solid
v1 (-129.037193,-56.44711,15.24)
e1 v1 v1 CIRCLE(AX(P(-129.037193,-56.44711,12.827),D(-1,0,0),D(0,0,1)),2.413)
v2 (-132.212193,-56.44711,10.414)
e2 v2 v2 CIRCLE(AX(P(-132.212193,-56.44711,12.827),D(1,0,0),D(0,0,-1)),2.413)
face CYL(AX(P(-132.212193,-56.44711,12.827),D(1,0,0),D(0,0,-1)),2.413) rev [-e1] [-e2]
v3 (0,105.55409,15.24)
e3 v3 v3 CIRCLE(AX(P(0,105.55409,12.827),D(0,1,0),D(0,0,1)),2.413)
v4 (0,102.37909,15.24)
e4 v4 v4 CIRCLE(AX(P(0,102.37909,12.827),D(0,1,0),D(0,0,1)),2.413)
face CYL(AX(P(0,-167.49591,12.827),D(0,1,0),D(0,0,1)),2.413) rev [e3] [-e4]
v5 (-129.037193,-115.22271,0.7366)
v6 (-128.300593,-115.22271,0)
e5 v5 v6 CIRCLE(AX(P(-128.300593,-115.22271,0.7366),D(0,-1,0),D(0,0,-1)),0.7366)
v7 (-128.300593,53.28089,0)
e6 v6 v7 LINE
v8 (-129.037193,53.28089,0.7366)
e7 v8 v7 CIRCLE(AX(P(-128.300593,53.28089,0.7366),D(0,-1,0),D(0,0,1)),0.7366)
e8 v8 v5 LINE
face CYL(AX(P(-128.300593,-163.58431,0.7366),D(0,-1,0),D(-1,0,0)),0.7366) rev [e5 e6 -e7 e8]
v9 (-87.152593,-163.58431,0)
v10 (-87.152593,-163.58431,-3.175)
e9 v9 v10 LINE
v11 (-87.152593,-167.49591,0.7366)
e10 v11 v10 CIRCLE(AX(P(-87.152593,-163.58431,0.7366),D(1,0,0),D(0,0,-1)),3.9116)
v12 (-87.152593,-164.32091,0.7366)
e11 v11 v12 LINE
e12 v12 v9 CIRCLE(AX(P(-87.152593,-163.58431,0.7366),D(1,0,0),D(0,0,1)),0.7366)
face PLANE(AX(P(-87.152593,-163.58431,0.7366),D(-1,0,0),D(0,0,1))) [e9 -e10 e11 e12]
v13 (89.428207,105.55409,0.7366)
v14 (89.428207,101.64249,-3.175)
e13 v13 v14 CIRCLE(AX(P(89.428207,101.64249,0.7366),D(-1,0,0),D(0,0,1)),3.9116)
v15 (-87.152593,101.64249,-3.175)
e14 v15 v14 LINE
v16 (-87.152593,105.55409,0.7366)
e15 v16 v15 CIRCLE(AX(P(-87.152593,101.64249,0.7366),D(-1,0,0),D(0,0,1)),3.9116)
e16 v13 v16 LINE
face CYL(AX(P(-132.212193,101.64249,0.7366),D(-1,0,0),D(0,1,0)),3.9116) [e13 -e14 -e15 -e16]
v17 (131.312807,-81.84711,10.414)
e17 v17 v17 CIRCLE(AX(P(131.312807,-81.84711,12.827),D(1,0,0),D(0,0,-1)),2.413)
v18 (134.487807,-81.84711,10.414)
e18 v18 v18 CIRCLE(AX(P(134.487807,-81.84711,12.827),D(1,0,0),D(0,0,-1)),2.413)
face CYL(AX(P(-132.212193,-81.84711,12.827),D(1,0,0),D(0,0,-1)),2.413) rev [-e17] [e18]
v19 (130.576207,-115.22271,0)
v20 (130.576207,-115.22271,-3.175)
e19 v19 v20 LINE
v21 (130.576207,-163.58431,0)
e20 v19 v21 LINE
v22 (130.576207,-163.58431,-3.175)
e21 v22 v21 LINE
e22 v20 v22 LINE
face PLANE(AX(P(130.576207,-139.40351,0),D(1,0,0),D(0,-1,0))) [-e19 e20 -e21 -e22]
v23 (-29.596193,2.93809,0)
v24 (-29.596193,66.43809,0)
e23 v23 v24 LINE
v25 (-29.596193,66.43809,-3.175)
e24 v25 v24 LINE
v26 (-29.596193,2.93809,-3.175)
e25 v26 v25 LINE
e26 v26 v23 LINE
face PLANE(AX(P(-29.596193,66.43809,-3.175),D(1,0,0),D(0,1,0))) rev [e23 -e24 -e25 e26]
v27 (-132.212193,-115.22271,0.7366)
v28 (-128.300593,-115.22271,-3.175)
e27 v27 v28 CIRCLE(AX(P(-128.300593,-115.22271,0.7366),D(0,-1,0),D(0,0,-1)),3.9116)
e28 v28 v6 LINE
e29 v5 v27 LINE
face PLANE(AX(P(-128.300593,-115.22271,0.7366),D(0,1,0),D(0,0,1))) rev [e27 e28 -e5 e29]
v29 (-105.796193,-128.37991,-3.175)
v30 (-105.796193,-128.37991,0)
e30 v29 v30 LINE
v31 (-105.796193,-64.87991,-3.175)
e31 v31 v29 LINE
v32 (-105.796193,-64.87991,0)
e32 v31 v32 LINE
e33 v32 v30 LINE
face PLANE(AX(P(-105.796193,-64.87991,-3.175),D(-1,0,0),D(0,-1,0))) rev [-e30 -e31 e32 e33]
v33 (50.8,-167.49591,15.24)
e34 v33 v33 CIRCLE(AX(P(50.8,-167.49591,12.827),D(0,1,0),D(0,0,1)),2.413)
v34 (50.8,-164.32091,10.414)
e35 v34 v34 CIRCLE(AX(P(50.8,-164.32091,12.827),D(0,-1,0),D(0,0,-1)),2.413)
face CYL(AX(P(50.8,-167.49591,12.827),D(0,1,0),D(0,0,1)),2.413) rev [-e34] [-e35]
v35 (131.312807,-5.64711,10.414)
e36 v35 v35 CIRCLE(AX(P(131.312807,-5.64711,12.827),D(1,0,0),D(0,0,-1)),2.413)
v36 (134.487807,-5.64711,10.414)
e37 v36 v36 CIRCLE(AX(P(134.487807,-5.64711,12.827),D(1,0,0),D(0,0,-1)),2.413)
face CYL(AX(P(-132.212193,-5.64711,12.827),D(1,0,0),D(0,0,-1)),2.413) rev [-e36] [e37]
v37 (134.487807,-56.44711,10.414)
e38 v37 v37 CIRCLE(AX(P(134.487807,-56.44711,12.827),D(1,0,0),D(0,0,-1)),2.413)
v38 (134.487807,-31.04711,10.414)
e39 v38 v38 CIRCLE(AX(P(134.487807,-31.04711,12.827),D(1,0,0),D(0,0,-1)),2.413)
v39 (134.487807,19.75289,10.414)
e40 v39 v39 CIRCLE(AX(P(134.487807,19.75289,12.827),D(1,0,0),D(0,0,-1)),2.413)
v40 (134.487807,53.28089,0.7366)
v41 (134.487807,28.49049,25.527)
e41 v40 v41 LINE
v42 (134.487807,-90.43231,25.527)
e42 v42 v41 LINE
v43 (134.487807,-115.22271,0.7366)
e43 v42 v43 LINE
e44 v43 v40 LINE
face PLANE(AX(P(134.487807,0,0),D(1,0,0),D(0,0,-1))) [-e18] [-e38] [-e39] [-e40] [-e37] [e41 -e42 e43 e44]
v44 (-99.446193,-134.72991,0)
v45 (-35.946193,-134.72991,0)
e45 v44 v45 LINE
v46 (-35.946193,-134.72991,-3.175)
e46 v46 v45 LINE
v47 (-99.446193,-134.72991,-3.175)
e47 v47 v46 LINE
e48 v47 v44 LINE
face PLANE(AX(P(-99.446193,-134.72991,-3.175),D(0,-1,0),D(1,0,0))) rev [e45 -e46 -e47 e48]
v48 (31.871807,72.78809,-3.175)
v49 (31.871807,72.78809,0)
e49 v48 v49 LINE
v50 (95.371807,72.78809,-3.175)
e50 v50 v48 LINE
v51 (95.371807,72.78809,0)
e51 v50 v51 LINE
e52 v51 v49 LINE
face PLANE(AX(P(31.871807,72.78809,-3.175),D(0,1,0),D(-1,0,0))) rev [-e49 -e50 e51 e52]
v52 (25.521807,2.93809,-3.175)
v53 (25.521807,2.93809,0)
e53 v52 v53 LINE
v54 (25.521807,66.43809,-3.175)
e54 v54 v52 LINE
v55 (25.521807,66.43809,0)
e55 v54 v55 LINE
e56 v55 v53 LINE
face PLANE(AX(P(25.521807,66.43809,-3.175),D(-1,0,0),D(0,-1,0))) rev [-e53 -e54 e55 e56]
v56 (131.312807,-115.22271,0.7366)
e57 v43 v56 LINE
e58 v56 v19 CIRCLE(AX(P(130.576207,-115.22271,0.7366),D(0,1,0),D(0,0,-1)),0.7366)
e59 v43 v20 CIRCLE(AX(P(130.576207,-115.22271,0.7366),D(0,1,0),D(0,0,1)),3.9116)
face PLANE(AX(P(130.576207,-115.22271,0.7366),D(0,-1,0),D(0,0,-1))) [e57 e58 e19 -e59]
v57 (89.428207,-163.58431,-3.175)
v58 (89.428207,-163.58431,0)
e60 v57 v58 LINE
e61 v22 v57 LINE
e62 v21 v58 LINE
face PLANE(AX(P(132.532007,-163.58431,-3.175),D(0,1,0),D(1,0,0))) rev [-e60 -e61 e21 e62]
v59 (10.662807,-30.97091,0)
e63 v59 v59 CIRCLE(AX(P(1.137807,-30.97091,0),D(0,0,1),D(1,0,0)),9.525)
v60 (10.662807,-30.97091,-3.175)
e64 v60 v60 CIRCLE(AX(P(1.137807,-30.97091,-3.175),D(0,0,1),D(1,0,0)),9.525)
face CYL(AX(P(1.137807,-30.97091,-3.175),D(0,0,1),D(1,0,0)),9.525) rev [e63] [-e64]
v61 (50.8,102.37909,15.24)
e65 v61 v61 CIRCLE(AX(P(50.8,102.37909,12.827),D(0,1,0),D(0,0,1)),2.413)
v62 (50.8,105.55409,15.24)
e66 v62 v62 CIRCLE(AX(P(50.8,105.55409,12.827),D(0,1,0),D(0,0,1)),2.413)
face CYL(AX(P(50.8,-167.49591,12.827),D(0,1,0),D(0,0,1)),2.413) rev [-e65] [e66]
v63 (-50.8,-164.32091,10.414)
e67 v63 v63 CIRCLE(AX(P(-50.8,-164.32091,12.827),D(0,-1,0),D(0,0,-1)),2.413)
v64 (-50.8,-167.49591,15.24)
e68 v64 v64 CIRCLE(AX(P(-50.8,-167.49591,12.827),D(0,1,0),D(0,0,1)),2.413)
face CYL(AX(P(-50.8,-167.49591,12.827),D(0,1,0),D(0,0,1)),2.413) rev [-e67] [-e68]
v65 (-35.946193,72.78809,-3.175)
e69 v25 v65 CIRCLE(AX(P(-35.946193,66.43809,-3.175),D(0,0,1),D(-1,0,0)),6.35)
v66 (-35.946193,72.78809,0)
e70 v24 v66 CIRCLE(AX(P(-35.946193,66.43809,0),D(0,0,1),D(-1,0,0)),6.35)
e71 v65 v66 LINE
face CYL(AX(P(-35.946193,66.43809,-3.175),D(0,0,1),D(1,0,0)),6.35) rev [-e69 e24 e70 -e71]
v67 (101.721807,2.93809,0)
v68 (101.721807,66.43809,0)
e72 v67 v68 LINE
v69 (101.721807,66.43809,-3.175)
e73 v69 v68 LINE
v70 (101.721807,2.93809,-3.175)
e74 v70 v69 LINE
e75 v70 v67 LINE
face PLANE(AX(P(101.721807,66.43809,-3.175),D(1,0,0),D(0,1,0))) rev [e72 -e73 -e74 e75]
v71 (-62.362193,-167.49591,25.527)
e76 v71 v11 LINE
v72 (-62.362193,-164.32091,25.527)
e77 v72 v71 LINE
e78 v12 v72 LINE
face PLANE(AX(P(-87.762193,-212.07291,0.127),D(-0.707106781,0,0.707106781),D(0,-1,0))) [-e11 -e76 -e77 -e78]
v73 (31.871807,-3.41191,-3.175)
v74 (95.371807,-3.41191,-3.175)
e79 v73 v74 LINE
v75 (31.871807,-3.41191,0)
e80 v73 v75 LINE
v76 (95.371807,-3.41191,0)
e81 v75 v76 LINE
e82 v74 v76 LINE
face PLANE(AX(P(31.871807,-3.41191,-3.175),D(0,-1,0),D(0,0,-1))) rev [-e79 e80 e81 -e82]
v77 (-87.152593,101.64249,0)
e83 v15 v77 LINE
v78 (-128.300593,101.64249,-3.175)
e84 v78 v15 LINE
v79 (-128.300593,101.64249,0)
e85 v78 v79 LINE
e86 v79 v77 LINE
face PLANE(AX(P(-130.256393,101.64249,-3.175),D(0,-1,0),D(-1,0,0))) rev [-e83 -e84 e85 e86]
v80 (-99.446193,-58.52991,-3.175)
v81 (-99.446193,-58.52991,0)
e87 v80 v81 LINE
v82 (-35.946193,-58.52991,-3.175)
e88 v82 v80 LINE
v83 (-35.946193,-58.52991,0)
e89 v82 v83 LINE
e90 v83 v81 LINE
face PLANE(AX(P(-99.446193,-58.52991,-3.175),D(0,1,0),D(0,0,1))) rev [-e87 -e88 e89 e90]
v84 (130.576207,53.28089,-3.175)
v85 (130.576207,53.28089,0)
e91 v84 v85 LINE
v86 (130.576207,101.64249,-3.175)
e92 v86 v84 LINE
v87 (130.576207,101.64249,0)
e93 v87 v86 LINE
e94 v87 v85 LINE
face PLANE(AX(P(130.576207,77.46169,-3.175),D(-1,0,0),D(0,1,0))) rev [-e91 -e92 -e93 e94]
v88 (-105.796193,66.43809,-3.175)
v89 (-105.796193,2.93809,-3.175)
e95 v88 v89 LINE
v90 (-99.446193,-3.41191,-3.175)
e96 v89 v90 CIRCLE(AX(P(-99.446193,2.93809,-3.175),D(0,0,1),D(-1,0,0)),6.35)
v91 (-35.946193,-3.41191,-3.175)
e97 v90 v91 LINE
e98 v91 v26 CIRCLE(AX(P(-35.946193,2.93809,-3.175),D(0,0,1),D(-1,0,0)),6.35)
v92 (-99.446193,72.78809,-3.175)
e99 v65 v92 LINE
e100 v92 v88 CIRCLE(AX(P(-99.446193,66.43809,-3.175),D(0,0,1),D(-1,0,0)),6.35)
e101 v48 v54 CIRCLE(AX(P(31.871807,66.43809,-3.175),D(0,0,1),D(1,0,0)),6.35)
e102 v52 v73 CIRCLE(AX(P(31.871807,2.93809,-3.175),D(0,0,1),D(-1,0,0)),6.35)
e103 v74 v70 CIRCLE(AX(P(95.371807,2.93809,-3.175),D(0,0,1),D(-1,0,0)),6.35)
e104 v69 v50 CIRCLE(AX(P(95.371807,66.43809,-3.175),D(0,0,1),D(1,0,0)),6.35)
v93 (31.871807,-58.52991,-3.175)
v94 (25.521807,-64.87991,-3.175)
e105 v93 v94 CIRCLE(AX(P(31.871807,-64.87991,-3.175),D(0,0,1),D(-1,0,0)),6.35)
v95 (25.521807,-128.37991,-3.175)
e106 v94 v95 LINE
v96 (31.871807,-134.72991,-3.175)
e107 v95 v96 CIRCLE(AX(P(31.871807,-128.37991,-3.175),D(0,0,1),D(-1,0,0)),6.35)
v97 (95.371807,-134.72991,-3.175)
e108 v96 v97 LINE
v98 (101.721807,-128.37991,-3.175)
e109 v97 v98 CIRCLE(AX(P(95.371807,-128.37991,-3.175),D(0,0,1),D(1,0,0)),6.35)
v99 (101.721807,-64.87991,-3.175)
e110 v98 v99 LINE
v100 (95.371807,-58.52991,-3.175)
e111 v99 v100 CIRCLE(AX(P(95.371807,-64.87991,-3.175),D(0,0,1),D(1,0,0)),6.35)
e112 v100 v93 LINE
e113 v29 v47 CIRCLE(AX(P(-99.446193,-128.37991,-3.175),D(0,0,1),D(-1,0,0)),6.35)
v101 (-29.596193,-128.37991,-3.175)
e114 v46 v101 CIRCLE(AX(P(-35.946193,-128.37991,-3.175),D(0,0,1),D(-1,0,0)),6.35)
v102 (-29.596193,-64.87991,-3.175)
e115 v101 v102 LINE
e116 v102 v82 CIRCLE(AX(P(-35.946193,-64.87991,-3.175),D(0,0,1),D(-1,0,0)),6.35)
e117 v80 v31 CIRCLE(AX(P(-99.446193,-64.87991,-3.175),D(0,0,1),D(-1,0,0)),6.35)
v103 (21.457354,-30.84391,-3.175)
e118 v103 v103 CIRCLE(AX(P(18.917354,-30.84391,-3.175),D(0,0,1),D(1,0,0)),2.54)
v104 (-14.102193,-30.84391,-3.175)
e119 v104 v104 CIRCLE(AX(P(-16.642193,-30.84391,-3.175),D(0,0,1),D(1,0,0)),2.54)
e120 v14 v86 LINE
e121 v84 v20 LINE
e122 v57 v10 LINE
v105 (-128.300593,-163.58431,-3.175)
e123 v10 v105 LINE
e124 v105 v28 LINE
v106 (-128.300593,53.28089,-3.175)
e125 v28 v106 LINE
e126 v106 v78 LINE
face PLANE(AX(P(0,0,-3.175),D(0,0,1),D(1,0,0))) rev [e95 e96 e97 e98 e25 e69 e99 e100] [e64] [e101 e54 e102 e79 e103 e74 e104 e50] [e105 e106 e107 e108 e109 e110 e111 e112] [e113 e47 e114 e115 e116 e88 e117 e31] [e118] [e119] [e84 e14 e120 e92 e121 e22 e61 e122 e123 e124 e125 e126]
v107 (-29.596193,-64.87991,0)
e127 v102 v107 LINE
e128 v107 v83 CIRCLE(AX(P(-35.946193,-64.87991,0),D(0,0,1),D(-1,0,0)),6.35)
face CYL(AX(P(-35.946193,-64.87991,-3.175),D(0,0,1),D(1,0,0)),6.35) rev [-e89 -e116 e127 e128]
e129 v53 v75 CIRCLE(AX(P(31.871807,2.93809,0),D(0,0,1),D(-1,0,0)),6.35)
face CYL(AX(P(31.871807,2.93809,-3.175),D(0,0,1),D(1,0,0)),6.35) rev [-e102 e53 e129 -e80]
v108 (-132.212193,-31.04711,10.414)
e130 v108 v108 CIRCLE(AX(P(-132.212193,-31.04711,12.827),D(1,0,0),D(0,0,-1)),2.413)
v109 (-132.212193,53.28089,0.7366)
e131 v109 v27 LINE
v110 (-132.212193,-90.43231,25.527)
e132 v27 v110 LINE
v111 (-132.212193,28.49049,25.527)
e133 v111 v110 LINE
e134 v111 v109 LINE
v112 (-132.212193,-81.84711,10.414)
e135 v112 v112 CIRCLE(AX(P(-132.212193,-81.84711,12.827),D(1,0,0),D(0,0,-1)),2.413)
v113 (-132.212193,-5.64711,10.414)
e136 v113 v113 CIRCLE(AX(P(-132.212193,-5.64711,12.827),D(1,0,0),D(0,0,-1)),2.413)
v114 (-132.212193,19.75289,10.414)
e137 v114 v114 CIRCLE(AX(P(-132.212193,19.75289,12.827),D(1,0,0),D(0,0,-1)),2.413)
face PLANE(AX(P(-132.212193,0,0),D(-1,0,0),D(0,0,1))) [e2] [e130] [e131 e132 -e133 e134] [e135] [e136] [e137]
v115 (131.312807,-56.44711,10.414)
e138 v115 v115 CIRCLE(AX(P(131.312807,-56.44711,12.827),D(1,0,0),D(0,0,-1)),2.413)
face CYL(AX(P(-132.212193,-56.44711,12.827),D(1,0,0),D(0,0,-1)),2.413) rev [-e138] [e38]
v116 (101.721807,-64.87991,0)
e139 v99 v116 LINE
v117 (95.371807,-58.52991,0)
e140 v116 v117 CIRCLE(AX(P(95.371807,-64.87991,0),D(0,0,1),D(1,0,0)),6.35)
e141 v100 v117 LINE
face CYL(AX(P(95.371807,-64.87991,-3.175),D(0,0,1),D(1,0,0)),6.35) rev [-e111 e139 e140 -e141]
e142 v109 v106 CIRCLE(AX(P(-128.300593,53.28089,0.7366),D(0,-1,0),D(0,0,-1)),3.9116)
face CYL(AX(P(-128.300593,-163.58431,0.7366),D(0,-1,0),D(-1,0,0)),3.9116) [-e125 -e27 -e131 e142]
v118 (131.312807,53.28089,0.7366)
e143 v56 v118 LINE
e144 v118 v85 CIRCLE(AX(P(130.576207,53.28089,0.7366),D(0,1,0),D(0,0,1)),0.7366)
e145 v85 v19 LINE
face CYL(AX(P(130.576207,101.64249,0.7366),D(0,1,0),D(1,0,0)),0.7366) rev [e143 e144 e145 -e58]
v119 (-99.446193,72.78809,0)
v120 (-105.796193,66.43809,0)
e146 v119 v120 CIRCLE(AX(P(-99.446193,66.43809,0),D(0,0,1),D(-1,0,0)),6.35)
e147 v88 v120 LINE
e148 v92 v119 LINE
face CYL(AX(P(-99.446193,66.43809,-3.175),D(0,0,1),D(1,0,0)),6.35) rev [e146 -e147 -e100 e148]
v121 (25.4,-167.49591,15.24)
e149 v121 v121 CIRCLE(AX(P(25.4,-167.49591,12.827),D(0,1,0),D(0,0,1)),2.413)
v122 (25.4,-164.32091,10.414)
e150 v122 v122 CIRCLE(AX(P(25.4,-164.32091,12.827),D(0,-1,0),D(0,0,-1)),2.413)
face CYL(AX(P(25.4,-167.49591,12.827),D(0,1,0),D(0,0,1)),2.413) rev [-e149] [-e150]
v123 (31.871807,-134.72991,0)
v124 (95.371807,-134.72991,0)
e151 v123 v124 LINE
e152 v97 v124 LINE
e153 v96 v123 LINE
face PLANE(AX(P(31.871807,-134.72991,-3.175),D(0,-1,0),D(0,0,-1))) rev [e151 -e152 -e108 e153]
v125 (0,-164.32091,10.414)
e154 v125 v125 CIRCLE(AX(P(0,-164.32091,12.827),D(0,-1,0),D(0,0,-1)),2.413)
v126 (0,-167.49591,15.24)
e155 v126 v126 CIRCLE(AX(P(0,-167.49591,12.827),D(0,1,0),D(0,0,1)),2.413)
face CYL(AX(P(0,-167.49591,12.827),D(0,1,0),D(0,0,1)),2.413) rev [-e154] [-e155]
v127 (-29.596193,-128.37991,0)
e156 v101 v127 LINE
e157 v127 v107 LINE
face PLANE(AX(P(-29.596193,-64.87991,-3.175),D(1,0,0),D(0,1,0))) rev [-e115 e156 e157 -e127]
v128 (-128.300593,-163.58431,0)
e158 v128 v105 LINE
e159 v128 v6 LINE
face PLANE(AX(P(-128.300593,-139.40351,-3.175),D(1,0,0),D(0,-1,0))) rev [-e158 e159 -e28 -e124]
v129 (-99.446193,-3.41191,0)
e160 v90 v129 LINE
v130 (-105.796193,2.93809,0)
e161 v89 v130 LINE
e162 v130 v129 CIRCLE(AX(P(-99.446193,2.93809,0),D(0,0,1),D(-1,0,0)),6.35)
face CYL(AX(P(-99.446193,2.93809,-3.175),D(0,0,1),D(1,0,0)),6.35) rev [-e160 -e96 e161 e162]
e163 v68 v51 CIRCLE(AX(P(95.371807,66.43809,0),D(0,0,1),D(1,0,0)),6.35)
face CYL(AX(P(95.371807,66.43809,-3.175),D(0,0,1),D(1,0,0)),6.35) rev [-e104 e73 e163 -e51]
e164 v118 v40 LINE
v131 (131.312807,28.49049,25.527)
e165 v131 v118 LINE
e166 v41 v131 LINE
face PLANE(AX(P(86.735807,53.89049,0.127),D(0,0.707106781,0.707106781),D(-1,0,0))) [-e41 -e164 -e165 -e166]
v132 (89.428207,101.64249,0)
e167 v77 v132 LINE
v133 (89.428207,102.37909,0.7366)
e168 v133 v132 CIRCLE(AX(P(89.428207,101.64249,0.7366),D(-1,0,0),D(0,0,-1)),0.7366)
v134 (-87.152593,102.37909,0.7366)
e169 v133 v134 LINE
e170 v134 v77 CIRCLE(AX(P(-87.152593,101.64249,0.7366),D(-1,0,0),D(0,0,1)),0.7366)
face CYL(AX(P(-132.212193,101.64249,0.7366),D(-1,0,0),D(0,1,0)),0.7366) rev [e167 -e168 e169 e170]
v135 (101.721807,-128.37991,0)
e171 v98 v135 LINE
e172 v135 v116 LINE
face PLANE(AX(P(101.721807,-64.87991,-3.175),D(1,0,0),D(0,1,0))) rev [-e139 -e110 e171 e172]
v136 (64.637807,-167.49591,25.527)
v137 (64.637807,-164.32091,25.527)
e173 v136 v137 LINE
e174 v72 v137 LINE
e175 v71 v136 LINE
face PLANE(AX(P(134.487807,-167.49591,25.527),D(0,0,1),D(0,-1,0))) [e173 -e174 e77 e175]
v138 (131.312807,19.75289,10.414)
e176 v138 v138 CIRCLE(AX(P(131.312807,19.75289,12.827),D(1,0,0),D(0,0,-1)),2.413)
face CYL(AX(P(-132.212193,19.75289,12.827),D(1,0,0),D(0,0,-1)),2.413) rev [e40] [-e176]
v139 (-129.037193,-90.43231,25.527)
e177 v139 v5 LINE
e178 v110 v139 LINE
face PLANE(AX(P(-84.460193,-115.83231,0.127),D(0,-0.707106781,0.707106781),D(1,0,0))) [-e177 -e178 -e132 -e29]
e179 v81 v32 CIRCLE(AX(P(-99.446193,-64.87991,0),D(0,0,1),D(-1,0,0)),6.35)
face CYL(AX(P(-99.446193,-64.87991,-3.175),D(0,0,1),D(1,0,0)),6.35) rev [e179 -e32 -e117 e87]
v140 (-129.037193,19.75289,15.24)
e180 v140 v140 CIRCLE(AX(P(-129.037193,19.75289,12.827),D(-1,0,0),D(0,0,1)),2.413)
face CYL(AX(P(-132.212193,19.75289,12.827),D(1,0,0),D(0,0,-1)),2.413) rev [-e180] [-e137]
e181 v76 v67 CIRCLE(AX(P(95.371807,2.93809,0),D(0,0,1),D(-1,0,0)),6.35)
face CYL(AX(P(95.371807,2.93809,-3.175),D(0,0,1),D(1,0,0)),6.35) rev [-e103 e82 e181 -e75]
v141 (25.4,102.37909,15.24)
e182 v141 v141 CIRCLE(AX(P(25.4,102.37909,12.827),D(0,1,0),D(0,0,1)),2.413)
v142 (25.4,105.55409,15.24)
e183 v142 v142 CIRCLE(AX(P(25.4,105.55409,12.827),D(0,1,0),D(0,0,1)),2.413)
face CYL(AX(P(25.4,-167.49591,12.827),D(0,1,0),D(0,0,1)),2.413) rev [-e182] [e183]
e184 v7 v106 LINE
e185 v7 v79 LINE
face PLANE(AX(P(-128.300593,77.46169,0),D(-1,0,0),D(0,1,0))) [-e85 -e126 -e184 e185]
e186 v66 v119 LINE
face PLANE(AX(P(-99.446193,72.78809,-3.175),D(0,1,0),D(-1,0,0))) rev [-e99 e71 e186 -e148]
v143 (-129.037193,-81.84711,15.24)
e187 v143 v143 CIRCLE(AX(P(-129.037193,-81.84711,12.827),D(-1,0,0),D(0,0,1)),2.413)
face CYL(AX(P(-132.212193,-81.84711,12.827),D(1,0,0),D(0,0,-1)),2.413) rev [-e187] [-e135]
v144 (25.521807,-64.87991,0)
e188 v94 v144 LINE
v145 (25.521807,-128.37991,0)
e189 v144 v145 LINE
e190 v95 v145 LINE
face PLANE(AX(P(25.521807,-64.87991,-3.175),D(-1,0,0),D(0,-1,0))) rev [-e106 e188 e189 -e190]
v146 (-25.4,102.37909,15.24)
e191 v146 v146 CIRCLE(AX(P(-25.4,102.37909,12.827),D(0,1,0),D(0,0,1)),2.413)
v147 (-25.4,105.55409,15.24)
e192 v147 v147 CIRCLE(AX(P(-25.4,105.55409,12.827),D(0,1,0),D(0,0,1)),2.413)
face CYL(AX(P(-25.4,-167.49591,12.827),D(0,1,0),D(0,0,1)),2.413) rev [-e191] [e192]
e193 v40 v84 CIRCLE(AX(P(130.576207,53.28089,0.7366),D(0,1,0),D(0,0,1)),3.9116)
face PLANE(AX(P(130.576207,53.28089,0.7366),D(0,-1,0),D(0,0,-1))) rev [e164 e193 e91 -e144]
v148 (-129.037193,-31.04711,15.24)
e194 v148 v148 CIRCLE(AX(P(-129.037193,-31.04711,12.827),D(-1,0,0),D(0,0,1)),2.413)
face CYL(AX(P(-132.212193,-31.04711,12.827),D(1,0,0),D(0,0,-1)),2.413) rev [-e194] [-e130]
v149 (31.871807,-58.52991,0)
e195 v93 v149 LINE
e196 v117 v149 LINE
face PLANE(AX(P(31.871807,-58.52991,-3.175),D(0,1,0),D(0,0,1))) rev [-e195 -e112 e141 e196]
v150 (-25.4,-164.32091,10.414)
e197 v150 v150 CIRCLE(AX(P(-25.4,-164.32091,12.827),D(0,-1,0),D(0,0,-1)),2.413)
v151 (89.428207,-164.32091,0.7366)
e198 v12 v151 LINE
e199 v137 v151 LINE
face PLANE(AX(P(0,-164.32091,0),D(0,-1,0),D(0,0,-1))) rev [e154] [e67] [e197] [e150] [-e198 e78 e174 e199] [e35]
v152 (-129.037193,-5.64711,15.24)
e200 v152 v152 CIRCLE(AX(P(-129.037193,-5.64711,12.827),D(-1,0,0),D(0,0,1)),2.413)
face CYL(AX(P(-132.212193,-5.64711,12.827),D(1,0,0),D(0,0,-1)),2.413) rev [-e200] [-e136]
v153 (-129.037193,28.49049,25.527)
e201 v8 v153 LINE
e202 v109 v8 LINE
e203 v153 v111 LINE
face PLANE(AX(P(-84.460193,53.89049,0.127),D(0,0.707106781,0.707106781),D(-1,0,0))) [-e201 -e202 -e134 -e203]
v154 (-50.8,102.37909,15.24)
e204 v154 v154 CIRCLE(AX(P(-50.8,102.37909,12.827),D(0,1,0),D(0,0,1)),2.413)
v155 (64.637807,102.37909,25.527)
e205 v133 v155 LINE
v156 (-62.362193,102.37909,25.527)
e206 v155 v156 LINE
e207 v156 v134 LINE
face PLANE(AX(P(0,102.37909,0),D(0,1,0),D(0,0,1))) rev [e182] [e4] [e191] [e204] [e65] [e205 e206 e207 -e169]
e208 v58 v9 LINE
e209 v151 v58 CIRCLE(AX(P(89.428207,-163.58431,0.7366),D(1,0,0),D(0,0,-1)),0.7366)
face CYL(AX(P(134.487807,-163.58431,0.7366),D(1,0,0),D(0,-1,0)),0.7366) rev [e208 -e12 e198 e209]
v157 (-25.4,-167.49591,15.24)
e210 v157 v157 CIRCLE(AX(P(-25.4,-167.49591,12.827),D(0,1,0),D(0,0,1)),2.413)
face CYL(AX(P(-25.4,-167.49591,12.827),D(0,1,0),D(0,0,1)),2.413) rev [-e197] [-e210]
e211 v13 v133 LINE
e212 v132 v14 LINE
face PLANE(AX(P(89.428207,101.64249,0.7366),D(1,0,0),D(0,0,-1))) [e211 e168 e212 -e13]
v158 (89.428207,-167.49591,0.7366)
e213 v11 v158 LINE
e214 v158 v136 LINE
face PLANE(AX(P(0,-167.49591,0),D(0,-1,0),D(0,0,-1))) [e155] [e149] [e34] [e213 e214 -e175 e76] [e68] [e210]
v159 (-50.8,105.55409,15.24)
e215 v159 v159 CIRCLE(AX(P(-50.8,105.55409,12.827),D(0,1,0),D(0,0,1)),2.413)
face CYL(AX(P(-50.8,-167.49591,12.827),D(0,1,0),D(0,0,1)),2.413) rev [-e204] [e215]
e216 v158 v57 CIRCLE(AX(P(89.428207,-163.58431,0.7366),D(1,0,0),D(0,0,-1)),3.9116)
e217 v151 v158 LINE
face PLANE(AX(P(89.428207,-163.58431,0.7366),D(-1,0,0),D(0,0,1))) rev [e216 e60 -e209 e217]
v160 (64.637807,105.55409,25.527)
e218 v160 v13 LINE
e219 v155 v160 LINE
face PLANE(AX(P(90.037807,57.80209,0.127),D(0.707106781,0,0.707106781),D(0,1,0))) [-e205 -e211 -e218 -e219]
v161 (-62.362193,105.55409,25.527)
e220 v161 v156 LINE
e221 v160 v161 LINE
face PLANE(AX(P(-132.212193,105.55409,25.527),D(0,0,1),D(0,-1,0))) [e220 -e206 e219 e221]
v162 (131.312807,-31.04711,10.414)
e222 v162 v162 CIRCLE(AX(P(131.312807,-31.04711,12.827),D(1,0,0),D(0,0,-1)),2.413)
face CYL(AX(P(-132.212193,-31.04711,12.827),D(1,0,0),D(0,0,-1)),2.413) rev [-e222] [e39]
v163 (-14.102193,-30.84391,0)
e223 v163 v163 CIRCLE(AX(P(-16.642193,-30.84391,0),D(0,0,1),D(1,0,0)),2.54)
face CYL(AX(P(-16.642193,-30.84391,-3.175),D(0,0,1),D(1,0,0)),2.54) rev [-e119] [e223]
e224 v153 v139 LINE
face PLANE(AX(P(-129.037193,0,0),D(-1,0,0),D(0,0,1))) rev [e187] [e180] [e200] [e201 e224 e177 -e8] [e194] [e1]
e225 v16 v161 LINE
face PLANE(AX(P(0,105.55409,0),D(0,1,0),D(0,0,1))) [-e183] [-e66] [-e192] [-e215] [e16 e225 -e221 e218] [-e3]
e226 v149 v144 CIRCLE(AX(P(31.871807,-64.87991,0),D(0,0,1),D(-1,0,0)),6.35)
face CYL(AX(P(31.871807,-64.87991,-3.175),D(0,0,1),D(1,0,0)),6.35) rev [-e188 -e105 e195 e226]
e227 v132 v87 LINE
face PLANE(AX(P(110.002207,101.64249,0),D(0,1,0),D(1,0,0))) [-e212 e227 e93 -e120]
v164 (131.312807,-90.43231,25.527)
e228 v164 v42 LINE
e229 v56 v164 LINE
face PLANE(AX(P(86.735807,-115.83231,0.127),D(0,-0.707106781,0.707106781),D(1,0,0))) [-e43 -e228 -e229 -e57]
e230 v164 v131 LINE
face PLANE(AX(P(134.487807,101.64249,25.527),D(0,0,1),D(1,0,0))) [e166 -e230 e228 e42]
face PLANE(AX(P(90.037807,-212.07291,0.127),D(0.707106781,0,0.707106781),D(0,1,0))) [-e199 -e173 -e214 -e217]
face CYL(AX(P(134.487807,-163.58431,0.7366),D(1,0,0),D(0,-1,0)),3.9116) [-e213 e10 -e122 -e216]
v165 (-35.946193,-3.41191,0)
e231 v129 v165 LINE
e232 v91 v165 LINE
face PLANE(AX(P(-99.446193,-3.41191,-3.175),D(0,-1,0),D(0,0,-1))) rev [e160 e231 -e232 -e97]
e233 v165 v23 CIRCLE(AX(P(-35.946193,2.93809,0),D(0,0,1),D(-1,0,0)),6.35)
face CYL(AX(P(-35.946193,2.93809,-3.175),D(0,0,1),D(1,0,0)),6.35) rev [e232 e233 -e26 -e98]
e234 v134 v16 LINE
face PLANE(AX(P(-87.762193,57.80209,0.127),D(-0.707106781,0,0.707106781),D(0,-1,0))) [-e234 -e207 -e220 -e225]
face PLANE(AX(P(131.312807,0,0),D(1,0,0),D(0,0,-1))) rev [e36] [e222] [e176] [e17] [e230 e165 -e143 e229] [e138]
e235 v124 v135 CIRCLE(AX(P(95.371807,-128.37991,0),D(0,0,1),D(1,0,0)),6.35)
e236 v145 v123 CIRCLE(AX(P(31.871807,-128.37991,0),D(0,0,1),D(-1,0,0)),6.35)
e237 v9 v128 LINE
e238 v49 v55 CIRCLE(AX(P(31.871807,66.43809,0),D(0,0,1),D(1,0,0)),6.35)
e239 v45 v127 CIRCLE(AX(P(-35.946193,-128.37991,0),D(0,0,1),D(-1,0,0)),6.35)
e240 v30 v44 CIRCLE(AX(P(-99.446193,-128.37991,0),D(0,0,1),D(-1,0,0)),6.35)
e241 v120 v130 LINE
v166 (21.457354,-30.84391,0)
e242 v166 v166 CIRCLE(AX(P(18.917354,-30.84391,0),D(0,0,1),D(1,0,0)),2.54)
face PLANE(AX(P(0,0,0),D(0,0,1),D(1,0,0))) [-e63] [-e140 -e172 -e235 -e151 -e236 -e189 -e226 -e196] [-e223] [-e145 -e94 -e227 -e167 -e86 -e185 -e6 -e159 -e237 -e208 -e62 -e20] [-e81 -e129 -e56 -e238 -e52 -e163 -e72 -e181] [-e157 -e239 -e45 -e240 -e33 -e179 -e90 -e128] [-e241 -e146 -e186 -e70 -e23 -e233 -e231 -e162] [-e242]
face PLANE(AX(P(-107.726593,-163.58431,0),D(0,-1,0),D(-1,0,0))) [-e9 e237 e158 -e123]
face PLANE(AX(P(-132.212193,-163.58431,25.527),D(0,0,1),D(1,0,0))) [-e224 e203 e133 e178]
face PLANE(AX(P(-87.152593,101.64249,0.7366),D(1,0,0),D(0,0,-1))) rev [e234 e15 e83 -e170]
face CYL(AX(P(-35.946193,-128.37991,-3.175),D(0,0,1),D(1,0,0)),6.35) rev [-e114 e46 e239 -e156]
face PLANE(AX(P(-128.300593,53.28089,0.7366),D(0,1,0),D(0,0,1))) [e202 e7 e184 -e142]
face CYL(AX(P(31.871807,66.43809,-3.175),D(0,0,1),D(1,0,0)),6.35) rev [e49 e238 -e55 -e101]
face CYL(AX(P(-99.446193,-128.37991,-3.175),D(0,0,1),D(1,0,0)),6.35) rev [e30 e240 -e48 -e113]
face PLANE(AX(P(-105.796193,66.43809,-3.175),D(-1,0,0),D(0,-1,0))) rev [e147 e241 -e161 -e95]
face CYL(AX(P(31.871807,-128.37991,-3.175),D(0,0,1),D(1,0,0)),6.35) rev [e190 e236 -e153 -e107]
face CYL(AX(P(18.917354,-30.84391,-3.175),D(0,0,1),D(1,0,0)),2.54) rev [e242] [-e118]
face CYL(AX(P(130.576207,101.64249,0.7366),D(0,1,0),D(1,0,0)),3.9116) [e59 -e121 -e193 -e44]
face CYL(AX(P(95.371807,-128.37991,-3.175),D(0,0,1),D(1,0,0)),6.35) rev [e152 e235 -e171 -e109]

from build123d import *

# Parameters (mm, degrees)
SKETCH1_W                     = 266.7
SKETCH1_H                     = 273.05
SKETCH1_R                     = 9.525
SKETCH1_R_2                   = 2.54
BASE_FLANGE4_DEPTH            = 3.175
EDGE_FLANGE13_STRIP_W         = 14.1732
EDGE_FLANGE13_STRIP_H         = 3.175
EDGE_FLANGE13_STRIP_CUT_DEPTH = 266.7
EDGE_FLANGE13_DEPTH           = 266.7
EDGE_FLANGE14_STRIP_W         = 14.1732
EDGE_FLANGE14_STRIP_H         = 3.175
EDGE_FLANGE14_STRIP_CUT_DEPTH = 266.7
EDGE_FLANGE14_DEPTH           = 266.7
SKETCH97_W                    = 44.45
SKETCH97_H                    = 24.7904
CUT_EXTRUDE17_DEPTH           = 47.752
SKETCH98_W                    = 44.45
SKETCH98_H                    = 24.7904
CUT_EXTRUDE18_DEPTH           = 47.752
SKETCH99_W                    = 44.45
SKETCH99_H                    = 24.7904
CUT_EXTRUDE19_DEPTH           = 47.752
SKETCH100_W                   = 44.45
SKETCH100_H                   = 24.7904
CUT_EXTRUDE20_DEPTH           = 47.752
EDGE_FLANGE15_STRIP_W         = 14.1732
EDGE_FLANGE15_STRIP_H         = 3.175
EDGE_FLANGE15_STRIP_CUT_DEPTH = 265.2268
EDGE_FLANGE15_DEPTH           = 265.2268
EDGE_FLANGE16_STRIP_W         = 14.1732
EDGE_FLANGE16_STRIP_H         = 3.175
EDGE_FLANGE16_STRIP_CUT_DEPTH = 265.2268
EDGE_FLANGE16_DEPTH           = 265.2268
SKETCH107_W                   = 24.7904
SKETCH107_H                   = 47.752
CUT_EXTRUDE21_DEPTH           = 47.752
SKETCH108_W                   = 24.7904
SKETCH108_H                   = 47.752
CUT_EXTRUDE22_DEPTH           = 47.752
SKETCH109_W                   = 24.7904
SKETCH109_H                   = 47.752
CUT_EXTRUDE23_DEPTH           = 47.752
SKETCH110_W                   = 24.7904
SKETCH110_H                   = 47.752
CUT_EXTRUDE24_DEPTH           = 47.752
CHAMFER5_SIZE                 = 25.4
SKETCH113_R                   = 2.413
CUT_EXTRUDE25_DEPTH           = 306.44213946
SKETCH114_R                   = 2.413
CUT_EXTRUDE26_DEPTH           = 316.967399731
CUT_EXTRUDE28_START           = -45.0596
CUT_EXTRUDE28_DEPTH           = 45.0596
CUT_EXTRUDE29_DEPTH           = 45.0596
CUT_EXTRUDE30_START           = -48.3616
CUT_EXTRUDE30_DEPTH           = 48.3616
CUT_EXTRUDE31_DEPTH           = 45.0596
CUT_EXTRUDE32_START           = -45.0596
CUT_EXTRUDE32_DEPTH           = 45.0596
CUT_EXTRUDE33_DEPTH           = 48.3616
CUT_EXTRUDE34_DEPTH           = 48.3616
CUT_EXTRUDE35_START           = -48.3616
CUT_EXTRUDE35_DEPTH           = 48.3616


# Sheet-metal steps are written as plain solids
with BuildPart() as part:
    # Sketch1 → Base-Flange4 (new body)
    with BuildSketch(Plane.XY):
        with Locations((1.137807361, -30.97091029)):
            Rectangle(SKETCH1_W, SKETCH1_H)
        with Locations((1.137807361, -30.97091029)):
            Circle(SKETCH1_R, mode=Mode.SUBTRACT)
        with Locations((-16.642192639, -30.84391029)):
            Circle(SKETCH1_R_2, mode=Mode.SUBTRACT)
        with Locations((18.917353784, -30.84391029)):
            Circle(SKETCH1_R_2, mode=Mode.SUBTRACT)
        with BuildLine():
            Line((-99.446192639, 72.78808971), (-35.946192639, 72.78808971))
            ThreePointArc((-35.946192639, 72.78808971), (-31.456064579, 70.92821777), (-29.596192639, 66.43808971))
            Line((-29.596192639, 66.43808971), (-29.596192639, 2.93808971))
            ThreePointArc((-29.596192639, 2.93808971), (-31.456064579, -1.552038351), (-35.946192639, -3.41191029))
            Line((-35.946192639, -3.41191029), (-99.446192639, -3.41191029))
            ThreePointArc((-99.446192639, -3.41191029), (-103.9363207, -1.552038351), (-105.796192639, 2.93808971))
            Line((-105.796192639, 2.93808971), (-105.796192639, 66.43808971))
            ThreePointArc((-105.796192639, 66.43808971), (-103.9363207, 70.92821777), (-99.446192639, 72.78808971))
        make_face(mode=Mode.SUBTRACT)
        with BuildLine():
            Line((31.871807361, 72.78808971), (95.371807361, 72.78808971))
            ThreePointArc((95.371807361, 72.78808971), (99.861935421, 70.92821777), (101.721807361, 66.43808971))
            Line((101.721807361, 66.43808971), (101.721807361, 2.93808971))
            ThreePointArc((101.721807361, 2.93808971), (99.861935421, -1.552038351), (95.371807361, -3.41191029))
            Line((95.371807361, -3.41191029), (31.871807361, -3.41191029))
            ThreePointArc((31.871807361, -3.41191029), (27.3816793, -1.552038351), (25.521807361, 2.93808971))
            Line((25.521807361, 2.93808971), (25.521807361, 66.43808971))
            ThreePointArc((25.521807361, 66.43808971), (27.3816793, 70.92821777), (31.871807361, 72.78808971))
        make_face(mode=Mode.SUBTRACT)
        with BuildLine():
            Line((-99.446192639, -58.52991029), (-35.946192639, -58.52991029))
            ThreePointArc((-35.946192639, -58.52991029), (-31.456064579, -60.38978223), (-29.596192639, -64.87991029))
            Line((-29.596192639, -64.87991029), (-29.596192639, -128.37991029))
            ThreePointArc((-29.596192639, -128.37991029), (-31.456064579, -132.870038351), (-35.946192639, -134.72991029))
            Line((-35.946192639, -134.72991029), (-99.446192639, -134.72991029))
            ThreePointArc((-99.446192639, -134.72991029), (-103.9363207, -132.870038351), (-105.796192639, -128.37991029))
            Line((-105.796192639, -128.37991029), (-105.796192639, -64.87991029))
            ThreePointArc((-105.796192639, -64.87991029), (-103.9363207, -60.38978223), (-99.446192639, -58.52991029))
        make_face(mode=Mode.SUBTRACT)
        with BuildLine():
            Line((31.871807361, -58.52991029), (95.371807361, -58.52991029))
            ThreePointArc((95.371807361, -58.52991029), (99.861935421, -60.38978223), (101.721807361, -64.87991029))
            Line((101.721807361, -64.87991029), (101.721807361, -128.37991029))
            ThreePointArc((101.721807361, -128.37991029), (99.861935421, -132.870038351), (95.371807361, -134.72991029))
            Line((95.371807361, -134.72991029), (31.871807361, -134.72991029))
            ThreePointArc((31.871807361, -134.72991029), (27.3816793, -132.870038351), (25.521807361, -128.37991029))
            Line((25.521807361, -128.37991029), (25.521807361, -64.87991029))
            ThreePointArc((25.521807361, -64.87991029), (27.3816793, -60.38978223), (31.871807361, -58.52991029))
        make_face(mode=Mode.SUBTRACT)
    extrude(amount=-BASE_FLANGE4_DEPTH)

    # Edge-Flange13 strip (across the edge) → Edge-Flange13 strip cut (cut)
    with BuildSketch(Plane(origin=(-132.212192639, -167.49591029, 0), x_dir=(0, 1, 0), z_dir=(1, 0, 0))):
        with Locations((-3.175, -1.5875)):
            Rectangle(EDGE_FLANGE13_STRIP_W, EDGE_FLANGE13_STRIP_H)
    extrude(amount=EDGE_FLANGE13_STRIP_CUT_DEPTH, mode=Mode.SUBTRACT)

    # Edge-Flange13 section (across the edge) → Edge-Flange13 (add)
    with BuildSketch(Plane(origin=(-132.212192639, -167.49591029, 0), x_dir=(0, 1, 0), z_dir=(1, 0, 0))):
        with BuildLine():
            Line((0, 0.7366), (0, 25.527))
            Line((0, 25.527), (3.175, 25.527))
            Line((3.175, 25.527), (3.175, 0.7366))
            ThreePointArc((3.175, 0.7366), (3.390745145, 0.215745145), (3.9116, 0))
            Line((3.9116, 0), (3.9116, -3.175))
            ThreePointArc((3.9116, -3.175), (1.145681115, -2.029318885), (0, 0.7366))
        make_face()
    extrude(amount=EDGE_FLANGE13_DEPTH)

    # Edge-Flange14 strip (across the edge) → Edge-Flange14 strip cut (cut)
    with BuildSketch(Plane(origin=(134.487807361, 105.55408971, 0), x_dir=(0, -1, 0), z_dir=(-1, 0, 0))):
        with Locations((-3.175, -1.5875)):
            Rectangle(EDGE_FLANGE14_STRIP_W, EDGE_FLANGE14_STRIP_H)
    extrude(amount=EDGE_FLANGE14_STRIP_CUT_DEPTH, mode=Mode.SUBTRACT)

    # Edge-Flange14 section (across the edge) → Edge-Flange14 (add)
    with BuildSketch(Plane(origin=(134.487807361, 105.55408971, 0), x_dir=(0, -1, 0), z_dir=(-1, 0, 0))):
        with BuildLine():
            Line((0, 0.7366), (0, 25.527))
            Line((0, 25.527), (3.175, 25.527))
            Line((3.175, 25.527), (3.175, 0.7366))
            ThreePointArc((3.175, 0.7366), (3.390745145, 0.215745145), (3.9116, 0))
            Line((3.9116, 0), (3.9116, -3.175))
            ThreePointArc((3.9116, -3.175), (1.145681115, -2.029318885), (0, 0.7366))
        make_face()
    extrude(amount=EDGE_FLANGE14_DEPTH)

    # Sketch97 → Cut-Extrude17 (cut)
    with BuildSketch(Plane(origin=(0, -164.32091029, 0), x_dir=(1, 0, 0), z_dir=(0, 1, 0))):
        with Locations((112.262807361, -13.1318)):
            Rectangle(SKETCH97_W, SKETCH97_H)
    extrude(amount=-CUT_EXTRUDE17_DEPTH, mode=Mode.SUBTRACT)

    # Sketch98 → Cut-Extrude18 (cut)
    with BuildSketch(Plane(origin=(0, -164.32091029, 0), x_dir=(1, 0, 0), z_dir=(0, 1, 0))):
        with Locations((-109.987192639, -13.1318)):
            Rectangle(SKETCH98_W, SKETCH98_H)
    extrude(amount=-CUT_EXTRUDE18_DEPTH, mode=Mode.SUBTRACT)

    # Sketch99 → Cut-Extrude19 (cut)
    with BuildSketch(Plane(origin=(0, 105.55408971, 0), x_dir=(1, 0, 0), z_dir=(0, 1, 0))):
        with Locations((112.262807361, -13.1318)):
            Rectangle(SKETCH99_W, SKETCH99_H)
    extrude(amount=-CUT_EXTRUDE19_DEPTH, mode=Mode.SUBTRACT)

    # Sketch100 → Cut-Extrude20 (cut)
    with BuildSketch(Plane(origin=(0, 105.55408971, 0), x_dir=(1, 0, 0), z_dir=(0, 1, 0))):
        with Locations((-109.987192639, -13.1318)):
            Rectangle(SKETCH100_W, SKETCH100_H)
    extrude(amount=-CUT_EXTRUDE20_DEPTH, mode=Mode.SUBTRACT)

    # Edge-Flange15 strip (across the edge) → Edge-Flange15 strip cut (cut)
    with BuildSketch(Plane(origin=(134.487807361, -163.58431029, 0), x_dir=(-1, 0, 0), z_dir=(0, 1, 0))):
        with Locations((-3.175, -1.5875)):
            Rectangle(EDGE_FLANGE15_STRIP_W, EDGE_FLANGE15_STRIP_H)
    extrude(amount=EDGE_FLANGE15_STRIP_CUT_DEPTH, mode=Mode.SUBTRACT)

    # Edge-Flange15 section (across the edge) → Edge-Flange15 (add)
    with BuildSketch(Plane(origin=(134.487807361, -163.58431029, 0), x_dir=(-1, 0, 0), z_dir=(0, 1, 0))):
        with BuildLine():
            Line((0, 0.7366), (0, 25.527))
            Line((0, 25.527), (3.175, 25.527))
            Line((3.175, 25.527), (3.175, 0.7366))
            ThreePointArc((3.175, 0.7366), (3.390745145, 0.215745145), (3.9116, 0))
            Line((3.9116, 0), (3.9116, -3.175))
            ThreePointArc((3.9116, -3.175), (1.145681115, -2.029318885), (0, 0.7366))
        make_face()
    extrude(amount=EDGE_FLANGE15_DEPTH)

    # Edge-Flange16 strip (across the edge) → Edge-Flange16 strip cut (cut)
    with BuildSketch(Plane(origin=(-132.212192639, 101.64248971, 0), x_dir=(1, 0, 0), z_dir=(0, -1, 0))):
        with Locations((-3.175, -1.5875)):
            Rectangle(EDGE_FLANGE16_STRIP_W, EDGE_FLANGE16_STRIP_H)
    extrude(amount=EDGE_FLANGE16_STRIP_CUT_DEPTH, mode=Mode.SUBTRACT)

    # Edge-Flange16 section (across the edge) → Edge-Flange16 (add)
    with BuildSketch(Plane(origin=(-132.212192639, 101.64248971, 0), x_dir=(1, 0, 0), z_dir=(0, -1, 0))):
        with BuildLine():
            Line((0, 0.7366), (0, 25.527))
            Line((0, 25.527), (3.175, 25.527))
            Line((3.175, 25.527), (3.175, 0.7366))
            ThreePointArc((3.175, 0.7366), (3.390745145, 0.215745145), (3.9116, 0))
            Line((3.9116, 0), (3.9116, -3.175))
            ThreePointArc((3.9116, -3.175), (1.145681115, -2.029318885), (0, 0.7366))
        make_face()
    extrude(amount=EDGE_FLANGE16_DEPTH)

    # Sketch107 → Cut-Extrude21 (cut)
    with BuildSketch(Plane.ZY.offset(132.212192639)):
        with Locations((13.1318, 77.76648971)):
            Rectangle(SKETCH107_W, SKETCH107_H)
    extrude(amount=-CUT_EXTRUDE21_DEPTH, mode=Mode.SUBTRACT)

    # Sketch108 → Cut-Extrude22 (cut)
    with BuildSketch(Plane.ZY.offset(132.212192639)):
        with Locations((13.1318, -139.70831029)):
            Rectangle(SKETCH108_W, SKETCH108_H)
    extrude(amount=-CUT_EXTRUDE22_DEPTH, mode=Mode.SUBTRACT)

    # Sketch109 → Cut-Extrude23 (cut)
    with BuildSketch(Plane(origin=(134.487807361, 0, 0), x_dir=(0, 0, -1), z_dir=(1, 0, 0))):
        with Locations((-13.1318, -139.70831029)):
            Rectangle(SKETCH109_W, SKETCH109_H)
    extrude(amount=-CUT_EXTRUDE23_DEPTH, mode=Mode.SUBTRACT)

    # Sketch110 → Cut-Extrude24 (cut)
    with BuildSketch(Plane(origin=(134.487807361, 0, 0), x_dir=(0, 0, -1), z_dir=(1, 0, 0))):
        with Locations((-13.1318, 77.76648971)):
            Rectangle(SKETCH110_W, SKETCH110_H)
    extrude(amount=-CUT_EXTRUDE24_DEPTH, mode=Mode.SUBTRACT)

    # Chamfer5
    # the kernel refuses this chamfer: 25.4 mm, written as the material it takes off along each edge
    with BuildSketch(Plane(origin=(90.037807361, -99.000162396, 25.527), x_dir=(-0.9996219169112966, 0, 0.027495876610586324), z_dir=(0, -1, 0))) as chamfer5_piece_1_section:
        Polygon((CHAMFER5_SIZE * 0.999621916911, CHAMFER5_SIZE * 0.0274958766106), (-CHAMFER5_SIZE * 0.0274958766106, CHAMFER5_SIZE * 0.999621916911), (0, 0), align=None)
    chamfer5_piece_1 = extrude(amount=133.816495789, mode=Mode.PRIVATE)
    chamfer5_piece_1 = split(chamfer5_piece_1, bisect_by=Plane(origin=(81.623550107, -165.90841029, 0.7366), z_dir=(0, 0, 1)), keep=Keep.TOP, mode=Mode.PRIVATE)
    add(chamfer5_piece_1, mode=Mode.SUBTRACT)
    with BuildSketch(Plane(origin=(199.808555255, -115.83231029, 25.527), x_dir=(-3.257797378778914e-15, -0.0274958766105862, -0.9996219169112966), z_dir=(-1, 0, 0))) as chamfer5_piece_2_section:
        Polygon((CHAMFER5_SIZE * 0.999621916911, -CHAMFER5_SIZE * 0.0274958766106), (-CHAMFER5_SIZE * 0.0274958766106, -CHAMFER5_SIZE * 0.999621916911), (0, 0), align=None)
    chamfer5_piece_2 = extrude(amount=133.816495789, mode=Mode.PRIVATE)
    chamfer5_piece_2 = split(chamfer5_piece_2, bisect_by=Plane(origin=(132.900307361, -107.418053037, 0.7366), z_dir=(0, 0, 1)), keep=Keep.TOP, mode=Mode.PRIVATE)
    add(chamfer5_piece_2, mode=Mode.SUBTRACT)
    with BuildSketch(Plane(origin=(-87.762192639, -99.000162396, 25.527), x_dir=(-0.0274958766105862, 3.2606747798650146e-15, -0.9996219169112966), z_dir=(0, -1, 0))) as chamfer5_piece_3_section:
        Polygon((CHAMFER5_SIZE * 0.999621916911, CHAMFER5_SIZE * 0.0274958766106), (-CHAMFER5_SIZE * 0.0274958766106, CHAMFER5_SIZE * 0.999621916911), (0, 0), align=None)
    chamfer5_piece_3 = extrude(amount=133.816495789, mode=Mode.PRIVATE)
    chamfer5_piece_3 = split(chamfer5_piece_3, bisect_by=Plane(origin=(-79.347935385, -165.90841029, 0.7366), z_dir=(0, 0, 1)), keep=Keep.TOP, mode=Mode.PRIVATE)
    add(chamfer5_piece_3, mode=Mode.SUBTRACT)
    with BuildSketch(Plane(origin=(-197.532940533, -115.83231029, 25.527), x_dir=(0, 0.9996219169112968, 0.027495876610586365), z_dir=(1, 0, 0))) as chamfer5_piece_4_section:
        Polygon((CHAMFER5_SIZE * 0.999621916911, -CHAMFER5_SIZE * 0.0274958766106), (-CHAMFER5_SIZE * 0.0274958766106, -CHAMFER5_SIZE * 0.999621916911), (0, 0), align=None)
    chamfer5_piece_4 = extrude(amount=133.816495789, mode=Mode.PRIVATE)
    chamfer5_piece_4 = split(chamfer5_piece_4, bisect_by=Plane(origin=(-130.624692639, -107.418053037, 0.7366), z_dir=(0, 0, 1)), keep=Keep.TOP, mode=Mode.PRIVATE)
    add(chamfer5_piece_4, mode=Mode.SUBTRACT)
    with BuildSketch(Plane(origin=(-197.532940533, 53.89048971, 25.527), x_dir=(4.344688972067252e-15, 0.027495876610586743, -0.9996219169112966), z_dir=(1, 0, 0))) as chamfer5_piece_5_section:
        Polygon((CHAMFER5_SIZE * 0.999621916911, -CHAMFER5_SIZE * 0.0274958766106), (-CHAMFER5_SIZE * 0.0274958766106, -CHAMFER5_SIZE * 0.999621916911), (0, 0), align=None)
    chamfer5_piece_5 = extrude(amount=133.816495789, mode=Mode.PRIVATE)
    chamfer5_piece_5 = split(chamfer5_piece_5, bisect_by=Plane(origin=(-130.624692639, 45.476232456, 0.7366), z_dir=(0, 0, 1)), keep=Keep.TOP, mode=Mode.PRIVATE)
    add(chamfer5_piece_5, mode=Mode.SUBTRACT)
    with BuildSketch(Plane(origin=(-87.762192639, 170.874837604, 25.527), x_dir=(0.9996219169112966, 0, 0.027495876610586324), z_dir=(0, -1, 0))) as chamfer5_piece_6_section:
        Polygon((CHAMFER5_SIZE * 0.999621916911, -CHAMFER5_SIZE * 0.0274958766106), (-CHAMFER5_SIZE * 0.0274958766106, -CHAMFER5_SIZE * 0.999621916911), (0, 0), align=None)
    chamfer5_piece_6 = extrude(amount=133.816495789, mode=Mode.PRIVATE)
    chamfer5_piece_6 = split(chamfer5_piece_6, bisect_by=Plane(origin=(-79.347935385, 103.96658971, 0.7366), z_dir=(0, 0, 1)), keep=Keep.TOP, mode=Mode.PRIVATE)
    add(chamfer5_piece_6, mode=Mode.SUBTRACT)
    with BuildSketch(Plane(origin=(199.808555255, 53.89048971, 25.527), x_dir=(0, -0.9996219169112968, 0.02749587661058633), z_dir=(-1, 0, 0))) as chamfer5_piece_7_section:
        Polygon((CHAMFER5_SIZE * 0.999621916911, -CHAMFER5_SIZE * 0.0274958766106), (-CHAMFER5_SIZE * 0.0274958766106, -CHAMFER5_SIZE * 0.999621916911), (0, 0), align=None)
    chamfer5_piece_7 = extrude(amount=133.816495789, mode=Mode.PRIVATE)
    chamfer5_piece_7 = split(chamfer5_piece_7, bisect_by=Plane(origin=(132.900307361, 45.476232456, 0.7366), z_dir=(0, 0, 1)), keep=Keep.TOP, mode=Mode.PRIVATE)
    add(chamfer5_piece_7, mode=Mode.SUBTRACT)
    with BuildSketch(Plane(origin=(90.037807361, 170.874837604, 25.527), x_dir=(0.0274958766105862, -3.2606747798650146e-15, -0.9996219169112966), z_dir=(0, -1, 0))) as chamfer5_piece_8_section:
        Polygon((CHAMFER5_SIZE * 0.999621916911, -CHAMFER5_SIZE * 0.0274958766106), (-CHAMFER5_SIZE * 0.0274958766106, -CHAMFER5_SIZE * 0.999621916911), (0, 0), align=None)
    chamfer5_piece_8 = extrude(amount=133.816495789, mode=Mode.PRIVATE)
    chamfer5_piece_8 = split(chamfer5_piece_8, bisect_by=Plane(origin=(81.623550107, 103.96658971, 0.7366), z_dir=(0, 0, 1)), keep=Keep.TOP, mode=Mode.PRIVATE)
    add(chamfer5_piece_8, mode=Mode.SUBTRACT)

    # Sketch113 → Cut-Extrude25 (cut, through all)
    with BuildSketch(Plane(origin=(0, 105.55408971, 0), x_dir=(1, 0, 0), z_dir=(0, 1, 0))):
        with Locations(Location((50.8, -12.827, 0), (0, 0, 270))):
            Circle(SKETCH113_R)
        with Locations(Location((25.4, -12.827, 0), (0, 0, 270))):
            Circle(SKETCH113_R)
        with Locations(Location((0, -12.827, 0), (0, 0, 270))):
            Circle(SKETCH113_R)
        with Locations(Location((-25.4, -12.827, 0), (0, 0, 270))):
            Circle(SKETCH113_R)
        with Locations(Location((-50.8, -12.827, 0), (0, 0, 270))):
            Circle(SKETCH113_R)
    extrude(amount=-CUT_EXTRUDE25_DEPTH, mode=Mode.SUBTRACT)

    # Sketch114 → Cut-Extrude26 (cut, through all)
    with BuildSketch(Plane(origin=(134.487807361, 0, 0), x_dir=(0, 0, -1), z_dir=(1, 0, 0))):
        with Locations((-12.827, -81.84711029)):
            Circle(SKETCH114_R)
        with Locations((-12.827, -56.44711029)):
            Circle(SKETCH114_R)
        with Locations((-12.827, -31.04711029)):
            Circle(SKETCH114_R)
        with Locations((-12.827, -5.64711029)):
            Circle(SKETCH114_R)
        with Locations((-12.827, 19.75288971)):
            Circle(SKETCH114_R)
    extrude(amount=-CUT_EXTRUDE26_DEPTH, mode=Mode.SUBTRACT)

    # Sketch115 → Cut-Extrude28 (cut)
    with BuildSketch(Plane(origin=(134.487807361, 0, 0), x_dir=(0, 0, -1), z_dir=(1, 0, 0)).offset(CUT_EXTRUDE28_START)):
        with BuildLine():
            Line((-0.7366, -167.49591029), (-0.7366, -164.32091029))
            ThreePointArc((-0.7366, -164.32091029), (-0.215745145, -164.105165145), (0, -163.58431029))
            Line((0, -163.58431029), (3.175, -163.58431029))
            ThreePointArc((3.175, -163.58431029), (2.029318885, -166.350229176), (-0.7366, -167.49591029))
        make_face()
    extrude(amount=CUT_EXTRUDE28_DEPTH, mode=Mode.SUBTRACT)

    # Sketch116 → Cut-Extrude29 (cut)
    with BuildSketch(Plane.ZY.offset(132.212192639)):
        with BuildLine():
            Line((0, -163.58431029), (-3.175, -163.58431029))
            ThreePointArc((-3.175, -163.58431029), (-2.029318885, -166.350229176), (0.7366, -167.49591029))
            Line((0.7366, -167.49591029), (0.7366, -164.32091029))
            ThreePointArc((0.7366, -164.32091029), (0.215745145, -164.105165145), (0, -163.58431029))
        make_face()
    extrude(amount=-CUT_EXTRUDE29_DEPTH, mode=Mode.SUBTRACT)

    # Sketch117 → Cut-Extrude30 (cut)
    with BuildSketch(Plane.XZ.offset(163.58431029).offset(CUT_EXTRUDE30_START)):
        with BuildLine():
            Line((-129.037192639, 0.7366), (-132.212192639, 0.7366))
            ThreePointArc((-132.212192639, 0.7366), (-131.066511524, -2.029318885), (-128.300592639, -3.175))
            Line((-128.300592639, -3.175), (-128.300592639, 0))
            ThreePointArc((-128.300592639, 0), (-128.821447494, 0.215745145), (-129.037192639, 0.7366))
        make_face()
    extrude(amount=CUT_EXTRUDE30_DEPTH, mode=Mode.SUBTRACT)

    # Sketch118 → Cut-Extrude31 (cut)
    with BuildSketch(Plane(origin=(134.487807361, 0, 0), x_dir=(0, 0, -1), z_dir=(1, 0, 0))):
        with BuildLine():
            Line((-0.7366, 102.37908971), (-0.7366, 105.55408971))
            ThreePointArc((-0.7366, 105.55408971), (2.029318885, 104.408408595), (3.175, 101.64248971))
            Line((3.175, 101.64248971), (0, 101.64248971))
            ThreePointArc((0, 101.64248971), (-0.215745145, 102.163344565), (-0.7366, 102.37908971))
        make_face()
    extrude(amount=-CUT_EXTRUDE31_DEPTH, mode=Mode.SUBTRACT)

    # Sketch119 → Cut-Extrude32 (cut)
    with BuildSketch(Plane.ZY.offset(132.212192639).offset(CUT_EXTRUDE32_START)):
        with BuildLine():
            Line((0.7366, 102.37908971), (0.7366, 105.55408971))
            ThreePointArc((0.7366, 105.55408971), (-2.029318885, 104.408408595), (-3.175, 101.64248971))
            Line((-3.175, 101.64248971), (0, 101.64248971))
            ThreePointArc((0, 101.64248971), (0.215745145, 102.163344565), (0.7366, 102.37908971))
        make_face()
    extrude(amount=CUT_EXTRUDE32_DEPTH, mode=Mode.SUBTRACT)

    # Sketch120 → Cut-Extrude33 (cut)
    with BuildSketch(Plane(origin=(0, 101.64248971, 0), x_dir=(1, 0, 0), z_dir=(0, 1, 0))):
        with BuildLine():
            Line((-129.037192639, -0.7366), (-132.212192639, -0.7366))
            ThreePointArc((-132.212192639, -0.7366), (-131.066511524, 2.029318885), (-128.300592639, 3.175))
            Line((-128.300592639, 3.175), (-128.300592639, 0))
            ThreePointArc((-128.300592639, 0), (-128.821447494, -0.215745145), (-129.037192639, -0.7366))
        make_face()
    extrude(amount=-CUT_EXTRUDE33_DEPTH, mode=Mode.SUBTRACT)

    # Sketch121 → Cut-Extrude34 (cut)
    with BuildSketch(Plane.XZ.offset(163.58431029)):
        with BuildLine():
            Line((131.312807361, 0.7366), (134.487807361, 0.7366))
            ThreePointArc((134.487807361, 0.7366), (133.342126246, -2.029318885), (130.576207361, -3.175))
            Line((130.576207361, -3.175), (130.576207361, 0))
            ThreePointArc((130.576207361, 0), (131.097062216, 0.215745145), (131.312807361, 0.7366))
        make_face()
    extrude(amount=-CUT_EXTRUDE34_DEPTH, mode=Mode.SUBTRACT)

    # Sketch122 → Cut-Extrude35 (cut)
    with BuildSketch(Plane(origin=(0, 101.64248971, 0), x_dir=(1, 0, 0), z_dir=(0, 1, 0)).offset(CUT_EXTRUDE35_START)):
        with BuildLine():
            Line((134.487807361, -0.7366), (131.312807361, -0.7366))
            ThreePointArc((131.312807361, -0.7366), (131.097062216, -0.215745145), (130.576207361, 0))
            Line((130.576207361, 0), (130.576207361, 3.175))
            ThreePointArc((130.576207361, 3.175), (133.342126246, 2.029318885), (134.487807361, -0.7366))
        make_face()
    extrude(amount=CUT_EXTRUDE35_DEPTH, mode=Mode.SUBTRACT)


solid = part.part
